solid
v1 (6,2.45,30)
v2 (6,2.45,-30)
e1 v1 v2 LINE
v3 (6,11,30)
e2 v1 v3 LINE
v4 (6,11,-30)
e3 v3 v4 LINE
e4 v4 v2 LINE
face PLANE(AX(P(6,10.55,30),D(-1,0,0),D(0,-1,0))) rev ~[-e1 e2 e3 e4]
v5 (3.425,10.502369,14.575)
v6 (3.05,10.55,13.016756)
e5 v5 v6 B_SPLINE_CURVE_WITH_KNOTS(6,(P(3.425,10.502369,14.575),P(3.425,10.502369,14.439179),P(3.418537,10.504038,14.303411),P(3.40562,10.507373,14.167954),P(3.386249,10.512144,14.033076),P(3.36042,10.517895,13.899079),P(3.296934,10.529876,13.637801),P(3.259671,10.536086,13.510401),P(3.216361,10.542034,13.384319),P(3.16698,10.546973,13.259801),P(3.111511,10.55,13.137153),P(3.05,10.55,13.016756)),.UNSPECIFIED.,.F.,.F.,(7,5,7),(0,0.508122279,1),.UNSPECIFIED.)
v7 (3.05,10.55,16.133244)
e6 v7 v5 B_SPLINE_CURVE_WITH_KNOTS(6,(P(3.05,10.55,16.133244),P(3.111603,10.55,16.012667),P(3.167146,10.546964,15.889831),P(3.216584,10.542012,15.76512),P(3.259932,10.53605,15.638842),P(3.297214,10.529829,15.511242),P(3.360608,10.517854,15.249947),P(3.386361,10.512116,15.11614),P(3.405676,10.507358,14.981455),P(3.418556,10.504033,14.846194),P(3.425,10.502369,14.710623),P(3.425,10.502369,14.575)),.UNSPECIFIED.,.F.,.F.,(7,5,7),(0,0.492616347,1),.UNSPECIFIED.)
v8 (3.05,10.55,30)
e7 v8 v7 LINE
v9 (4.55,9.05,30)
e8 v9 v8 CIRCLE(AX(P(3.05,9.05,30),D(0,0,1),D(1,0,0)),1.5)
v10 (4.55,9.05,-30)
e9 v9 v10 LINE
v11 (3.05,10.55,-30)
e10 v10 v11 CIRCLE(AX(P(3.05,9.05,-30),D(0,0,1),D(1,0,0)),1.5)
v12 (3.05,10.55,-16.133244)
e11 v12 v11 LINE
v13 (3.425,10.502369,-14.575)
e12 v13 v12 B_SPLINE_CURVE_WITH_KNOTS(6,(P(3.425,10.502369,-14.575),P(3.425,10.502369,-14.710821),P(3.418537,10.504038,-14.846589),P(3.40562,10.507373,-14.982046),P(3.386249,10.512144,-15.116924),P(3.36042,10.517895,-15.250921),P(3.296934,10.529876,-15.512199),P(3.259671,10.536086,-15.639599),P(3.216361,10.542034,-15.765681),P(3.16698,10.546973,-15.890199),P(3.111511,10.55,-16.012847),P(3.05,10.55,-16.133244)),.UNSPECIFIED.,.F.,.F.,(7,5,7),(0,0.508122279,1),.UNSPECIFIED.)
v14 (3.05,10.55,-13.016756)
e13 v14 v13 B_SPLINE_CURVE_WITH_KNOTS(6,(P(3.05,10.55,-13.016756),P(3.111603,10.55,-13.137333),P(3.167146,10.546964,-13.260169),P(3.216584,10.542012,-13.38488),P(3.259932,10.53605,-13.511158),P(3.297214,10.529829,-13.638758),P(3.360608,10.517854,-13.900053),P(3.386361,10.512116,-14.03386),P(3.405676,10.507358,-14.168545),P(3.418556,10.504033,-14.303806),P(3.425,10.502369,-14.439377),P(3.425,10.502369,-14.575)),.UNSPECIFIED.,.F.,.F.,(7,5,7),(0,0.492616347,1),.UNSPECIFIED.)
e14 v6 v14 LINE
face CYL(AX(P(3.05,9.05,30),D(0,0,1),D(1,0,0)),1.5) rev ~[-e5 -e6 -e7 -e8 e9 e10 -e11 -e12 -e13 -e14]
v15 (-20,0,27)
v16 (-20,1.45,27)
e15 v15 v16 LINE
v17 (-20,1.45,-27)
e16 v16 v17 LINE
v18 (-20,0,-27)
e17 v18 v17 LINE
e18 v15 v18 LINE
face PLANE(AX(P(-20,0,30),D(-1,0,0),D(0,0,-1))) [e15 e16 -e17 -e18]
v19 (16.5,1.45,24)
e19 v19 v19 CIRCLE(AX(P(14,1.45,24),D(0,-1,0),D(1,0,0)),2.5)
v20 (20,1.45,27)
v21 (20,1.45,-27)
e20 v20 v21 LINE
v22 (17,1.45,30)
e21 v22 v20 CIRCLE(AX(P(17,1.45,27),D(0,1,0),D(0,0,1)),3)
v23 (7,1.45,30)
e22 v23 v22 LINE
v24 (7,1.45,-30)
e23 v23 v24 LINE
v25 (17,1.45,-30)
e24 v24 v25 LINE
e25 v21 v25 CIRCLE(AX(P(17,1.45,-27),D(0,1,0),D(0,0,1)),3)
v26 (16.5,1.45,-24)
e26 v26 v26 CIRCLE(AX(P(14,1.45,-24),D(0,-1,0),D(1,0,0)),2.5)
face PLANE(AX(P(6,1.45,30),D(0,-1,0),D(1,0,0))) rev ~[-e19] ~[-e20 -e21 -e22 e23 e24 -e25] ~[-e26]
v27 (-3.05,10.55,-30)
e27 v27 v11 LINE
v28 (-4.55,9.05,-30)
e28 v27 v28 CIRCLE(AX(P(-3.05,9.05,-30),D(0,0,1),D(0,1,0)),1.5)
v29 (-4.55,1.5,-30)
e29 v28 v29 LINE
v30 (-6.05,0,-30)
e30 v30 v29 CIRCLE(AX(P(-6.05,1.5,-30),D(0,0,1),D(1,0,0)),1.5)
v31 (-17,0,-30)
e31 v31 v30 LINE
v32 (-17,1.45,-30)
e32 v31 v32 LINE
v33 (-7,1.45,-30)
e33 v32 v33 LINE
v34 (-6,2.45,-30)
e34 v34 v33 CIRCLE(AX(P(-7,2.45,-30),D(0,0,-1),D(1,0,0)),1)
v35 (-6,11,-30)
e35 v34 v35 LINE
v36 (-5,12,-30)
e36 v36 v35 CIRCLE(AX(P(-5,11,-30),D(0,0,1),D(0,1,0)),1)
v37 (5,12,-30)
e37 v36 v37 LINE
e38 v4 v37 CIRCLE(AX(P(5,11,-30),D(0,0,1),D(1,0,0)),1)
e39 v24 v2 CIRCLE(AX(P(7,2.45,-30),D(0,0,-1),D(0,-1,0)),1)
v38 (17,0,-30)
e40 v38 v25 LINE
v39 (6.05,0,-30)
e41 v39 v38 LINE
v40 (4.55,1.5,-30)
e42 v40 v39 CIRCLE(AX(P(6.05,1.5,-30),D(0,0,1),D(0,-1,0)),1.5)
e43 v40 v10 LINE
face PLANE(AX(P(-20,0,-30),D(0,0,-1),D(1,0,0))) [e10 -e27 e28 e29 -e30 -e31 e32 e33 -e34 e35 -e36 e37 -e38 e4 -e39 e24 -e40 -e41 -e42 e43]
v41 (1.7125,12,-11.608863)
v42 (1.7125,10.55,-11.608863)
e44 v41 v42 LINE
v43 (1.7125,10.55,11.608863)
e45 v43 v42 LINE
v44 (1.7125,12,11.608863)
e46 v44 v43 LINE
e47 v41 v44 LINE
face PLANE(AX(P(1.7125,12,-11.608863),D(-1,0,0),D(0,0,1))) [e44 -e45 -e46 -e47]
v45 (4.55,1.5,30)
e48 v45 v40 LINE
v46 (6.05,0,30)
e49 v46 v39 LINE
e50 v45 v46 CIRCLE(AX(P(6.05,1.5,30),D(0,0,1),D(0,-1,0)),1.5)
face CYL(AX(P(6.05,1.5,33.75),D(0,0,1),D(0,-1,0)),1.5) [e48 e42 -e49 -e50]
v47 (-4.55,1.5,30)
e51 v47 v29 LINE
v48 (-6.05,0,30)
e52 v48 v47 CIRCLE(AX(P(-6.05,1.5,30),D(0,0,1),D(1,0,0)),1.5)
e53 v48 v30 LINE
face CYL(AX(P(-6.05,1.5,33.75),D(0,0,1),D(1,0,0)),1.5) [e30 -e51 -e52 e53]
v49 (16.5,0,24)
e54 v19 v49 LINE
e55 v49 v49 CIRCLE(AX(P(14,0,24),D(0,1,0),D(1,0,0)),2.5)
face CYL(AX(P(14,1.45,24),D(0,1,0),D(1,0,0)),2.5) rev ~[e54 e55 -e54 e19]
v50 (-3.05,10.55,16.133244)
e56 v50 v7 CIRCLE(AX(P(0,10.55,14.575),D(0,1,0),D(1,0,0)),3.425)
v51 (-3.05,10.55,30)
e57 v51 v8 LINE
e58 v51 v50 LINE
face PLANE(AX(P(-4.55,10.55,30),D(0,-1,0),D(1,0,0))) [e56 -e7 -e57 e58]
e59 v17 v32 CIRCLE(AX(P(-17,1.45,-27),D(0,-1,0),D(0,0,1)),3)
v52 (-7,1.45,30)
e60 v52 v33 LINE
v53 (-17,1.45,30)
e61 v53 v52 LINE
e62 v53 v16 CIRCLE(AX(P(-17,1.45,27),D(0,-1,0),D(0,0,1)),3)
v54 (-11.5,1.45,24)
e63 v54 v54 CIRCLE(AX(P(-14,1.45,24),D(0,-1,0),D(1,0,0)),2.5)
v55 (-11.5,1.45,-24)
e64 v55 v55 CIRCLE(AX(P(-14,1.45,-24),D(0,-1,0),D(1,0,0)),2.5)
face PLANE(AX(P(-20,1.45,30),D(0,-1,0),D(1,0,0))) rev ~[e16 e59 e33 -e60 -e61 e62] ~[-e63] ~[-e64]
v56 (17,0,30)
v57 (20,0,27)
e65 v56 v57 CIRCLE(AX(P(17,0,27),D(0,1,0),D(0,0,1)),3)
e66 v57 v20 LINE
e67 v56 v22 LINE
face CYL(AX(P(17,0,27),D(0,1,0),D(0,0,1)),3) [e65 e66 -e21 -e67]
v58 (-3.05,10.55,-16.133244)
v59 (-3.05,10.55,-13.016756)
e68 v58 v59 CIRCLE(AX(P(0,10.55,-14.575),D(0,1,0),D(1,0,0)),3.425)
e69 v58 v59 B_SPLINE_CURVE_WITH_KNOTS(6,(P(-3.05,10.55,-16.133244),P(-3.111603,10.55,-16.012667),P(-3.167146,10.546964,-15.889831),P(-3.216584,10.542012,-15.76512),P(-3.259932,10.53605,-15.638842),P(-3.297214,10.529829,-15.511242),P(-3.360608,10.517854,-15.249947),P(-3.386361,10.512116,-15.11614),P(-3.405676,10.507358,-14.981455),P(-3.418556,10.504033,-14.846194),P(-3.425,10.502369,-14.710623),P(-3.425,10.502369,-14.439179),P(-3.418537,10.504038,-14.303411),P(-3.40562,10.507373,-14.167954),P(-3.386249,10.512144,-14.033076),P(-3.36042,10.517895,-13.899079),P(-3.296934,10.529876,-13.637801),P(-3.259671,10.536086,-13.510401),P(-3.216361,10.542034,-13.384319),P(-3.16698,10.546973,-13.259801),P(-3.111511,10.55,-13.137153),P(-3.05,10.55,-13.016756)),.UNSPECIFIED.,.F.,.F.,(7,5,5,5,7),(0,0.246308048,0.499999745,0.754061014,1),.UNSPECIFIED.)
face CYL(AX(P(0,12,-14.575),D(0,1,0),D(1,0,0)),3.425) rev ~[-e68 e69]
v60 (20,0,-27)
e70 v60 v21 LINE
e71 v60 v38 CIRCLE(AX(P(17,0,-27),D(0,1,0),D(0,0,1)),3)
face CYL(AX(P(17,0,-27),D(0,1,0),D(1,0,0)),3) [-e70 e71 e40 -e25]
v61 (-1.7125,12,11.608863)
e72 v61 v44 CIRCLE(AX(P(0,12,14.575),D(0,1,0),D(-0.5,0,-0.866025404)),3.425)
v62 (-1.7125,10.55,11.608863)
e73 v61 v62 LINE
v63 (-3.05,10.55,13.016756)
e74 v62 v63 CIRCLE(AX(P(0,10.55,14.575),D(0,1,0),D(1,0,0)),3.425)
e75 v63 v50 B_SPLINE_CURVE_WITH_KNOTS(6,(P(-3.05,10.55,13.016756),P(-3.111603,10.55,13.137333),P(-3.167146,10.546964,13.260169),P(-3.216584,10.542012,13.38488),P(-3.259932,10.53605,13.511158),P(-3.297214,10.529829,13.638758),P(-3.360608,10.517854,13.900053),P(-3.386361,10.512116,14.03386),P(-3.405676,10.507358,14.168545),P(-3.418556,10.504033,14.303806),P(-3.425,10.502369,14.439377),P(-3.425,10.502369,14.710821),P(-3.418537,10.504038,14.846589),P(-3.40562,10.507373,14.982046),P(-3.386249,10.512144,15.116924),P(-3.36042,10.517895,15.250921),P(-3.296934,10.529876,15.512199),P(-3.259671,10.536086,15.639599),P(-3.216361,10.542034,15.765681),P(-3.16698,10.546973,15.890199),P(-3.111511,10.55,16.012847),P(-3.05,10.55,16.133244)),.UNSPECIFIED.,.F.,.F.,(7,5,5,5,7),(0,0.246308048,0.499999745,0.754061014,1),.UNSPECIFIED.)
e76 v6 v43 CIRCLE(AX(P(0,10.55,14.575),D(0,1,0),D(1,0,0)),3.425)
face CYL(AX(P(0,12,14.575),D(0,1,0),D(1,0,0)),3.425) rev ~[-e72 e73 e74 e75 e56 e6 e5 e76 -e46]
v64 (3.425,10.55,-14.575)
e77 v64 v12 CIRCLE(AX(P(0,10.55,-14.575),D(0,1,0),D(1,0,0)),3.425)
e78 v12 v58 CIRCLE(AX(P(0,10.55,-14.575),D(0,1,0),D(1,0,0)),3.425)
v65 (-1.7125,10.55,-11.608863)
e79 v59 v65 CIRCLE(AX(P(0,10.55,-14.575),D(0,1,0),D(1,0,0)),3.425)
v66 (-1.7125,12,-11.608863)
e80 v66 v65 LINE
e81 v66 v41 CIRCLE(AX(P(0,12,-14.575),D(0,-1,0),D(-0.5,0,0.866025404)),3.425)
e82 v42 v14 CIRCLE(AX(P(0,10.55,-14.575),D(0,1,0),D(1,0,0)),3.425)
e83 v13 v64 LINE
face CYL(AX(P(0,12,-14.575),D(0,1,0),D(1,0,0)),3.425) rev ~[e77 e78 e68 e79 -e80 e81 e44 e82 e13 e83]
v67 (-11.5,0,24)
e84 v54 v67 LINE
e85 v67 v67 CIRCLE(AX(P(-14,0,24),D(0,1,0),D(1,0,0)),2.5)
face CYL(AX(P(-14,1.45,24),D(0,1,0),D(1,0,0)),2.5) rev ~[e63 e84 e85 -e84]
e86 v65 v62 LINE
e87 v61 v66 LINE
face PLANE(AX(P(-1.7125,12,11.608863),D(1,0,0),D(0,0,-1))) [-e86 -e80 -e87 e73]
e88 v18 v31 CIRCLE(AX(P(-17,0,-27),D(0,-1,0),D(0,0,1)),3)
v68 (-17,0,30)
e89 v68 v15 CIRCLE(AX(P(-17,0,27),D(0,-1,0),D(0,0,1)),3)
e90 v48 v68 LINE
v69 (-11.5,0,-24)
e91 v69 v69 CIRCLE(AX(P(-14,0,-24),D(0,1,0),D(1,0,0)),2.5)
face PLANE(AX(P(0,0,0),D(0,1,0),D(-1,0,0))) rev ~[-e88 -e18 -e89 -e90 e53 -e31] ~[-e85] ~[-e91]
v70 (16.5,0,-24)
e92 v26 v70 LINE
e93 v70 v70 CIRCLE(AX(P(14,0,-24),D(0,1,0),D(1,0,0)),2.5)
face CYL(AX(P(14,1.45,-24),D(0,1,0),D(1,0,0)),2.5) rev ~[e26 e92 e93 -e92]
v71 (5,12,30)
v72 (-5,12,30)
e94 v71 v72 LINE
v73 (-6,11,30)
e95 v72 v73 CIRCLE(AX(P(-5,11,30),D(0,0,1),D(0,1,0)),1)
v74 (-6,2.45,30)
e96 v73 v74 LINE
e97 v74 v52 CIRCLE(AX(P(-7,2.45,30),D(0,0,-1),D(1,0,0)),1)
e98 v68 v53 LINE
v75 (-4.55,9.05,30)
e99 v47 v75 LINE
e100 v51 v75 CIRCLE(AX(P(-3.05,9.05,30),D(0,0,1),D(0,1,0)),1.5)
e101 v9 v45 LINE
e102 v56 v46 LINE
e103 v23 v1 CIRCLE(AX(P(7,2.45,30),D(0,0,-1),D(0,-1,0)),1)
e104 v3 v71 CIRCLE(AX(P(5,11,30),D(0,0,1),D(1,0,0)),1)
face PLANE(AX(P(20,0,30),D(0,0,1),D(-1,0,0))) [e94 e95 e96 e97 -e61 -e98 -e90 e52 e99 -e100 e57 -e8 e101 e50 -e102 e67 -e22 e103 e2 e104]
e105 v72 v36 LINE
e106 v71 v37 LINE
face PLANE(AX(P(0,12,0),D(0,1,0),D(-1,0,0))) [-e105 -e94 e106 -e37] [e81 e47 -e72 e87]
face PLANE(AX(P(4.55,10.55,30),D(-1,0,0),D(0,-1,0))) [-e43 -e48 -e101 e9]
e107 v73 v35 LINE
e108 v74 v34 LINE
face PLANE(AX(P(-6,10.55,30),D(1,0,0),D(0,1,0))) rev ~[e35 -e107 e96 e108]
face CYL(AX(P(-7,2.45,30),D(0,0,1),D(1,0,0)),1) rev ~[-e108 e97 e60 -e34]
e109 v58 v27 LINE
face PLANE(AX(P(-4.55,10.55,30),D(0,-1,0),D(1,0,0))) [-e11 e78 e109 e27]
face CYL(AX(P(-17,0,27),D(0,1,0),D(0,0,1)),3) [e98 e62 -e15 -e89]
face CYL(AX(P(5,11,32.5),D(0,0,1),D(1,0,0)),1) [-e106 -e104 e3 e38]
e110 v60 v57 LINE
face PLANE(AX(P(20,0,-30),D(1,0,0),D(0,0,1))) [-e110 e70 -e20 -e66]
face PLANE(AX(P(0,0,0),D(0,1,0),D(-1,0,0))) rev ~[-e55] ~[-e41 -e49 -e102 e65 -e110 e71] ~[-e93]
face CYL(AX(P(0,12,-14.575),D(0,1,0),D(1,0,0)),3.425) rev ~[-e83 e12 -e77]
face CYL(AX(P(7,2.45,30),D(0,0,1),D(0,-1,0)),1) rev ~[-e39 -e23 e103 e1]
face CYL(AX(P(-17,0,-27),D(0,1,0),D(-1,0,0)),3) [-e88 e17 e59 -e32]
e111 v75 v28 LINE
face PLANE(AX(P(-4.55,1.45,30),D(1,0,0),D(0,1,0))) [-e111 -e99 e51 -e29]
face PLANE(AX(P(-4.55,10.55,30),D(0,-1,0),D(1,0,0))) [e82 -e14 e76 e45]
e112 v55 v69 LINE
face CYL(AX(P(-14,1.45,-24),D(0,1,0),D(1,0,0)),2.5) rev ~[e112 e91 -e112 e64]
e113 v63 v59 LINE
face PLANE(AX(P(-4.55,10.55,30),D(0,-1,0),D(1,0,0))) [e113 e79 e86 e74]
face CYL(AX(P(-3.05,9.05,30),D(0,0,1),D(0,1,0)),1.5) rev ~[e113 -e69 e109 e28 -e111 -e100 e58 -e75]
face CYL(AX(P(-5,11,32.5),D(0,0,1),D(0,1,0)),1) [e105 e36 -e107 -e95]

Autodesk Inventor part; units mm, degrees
ref_plane "YZ Plane" through (0, 0, 0) normal (1, 0, 0) x (0, 1, 0)
ref_plane "XZ Plane" through (0, 0, 0) normal (0, 1, 0) x (-1, 0, 0)
ref_plane "XY Plane" through (0, 0, 0) normal (0, 0, 1) x (1, 0, 0)
sketch "Sketch1" plane through (0, 0, 0) normal (0, 1, 0) x (-1, 0, 0)
  line L0 (-20, 30) -> (20, 30)
  line L1 (20, 30) -> (20, -30)
  line L2 (20, -30) -> (-20, -30)
  line L3 (-20, -30) -> (-20, 30)
  line L4 (-20, 30) -> (20, -30) construction
  line L5 (20, 30) -> (-20, -30) construction
  point P0 (0, 0)
  dimension "d0" = 40
  dimension "d1" = 60
extrude "Extrusion1" add sketch "Sketch1" along normal blind 12
sketch "Sketch2" plane through (-20, 0, 30) normal (0, 0, 1) x (1, 0, 0)
  line L0 (0, 0) -> (0, 12) projected
  line L1 (0, 0) -> (0, 1.45)
  line L2 (0, 1.45) -> (14, 1.45)
  line L3 (14, 1.45) -> (14, 12)
  line L4 (40, 12) -> (0, 12) projected
  line L5 (14, 12) -> (26, 12)
  line L6 (26, 12) -> (26, 1.45)
  line L7 (26, 1.45) -> (40, 1.45)
  line L8 (40, 0) -> (40, 12) projected
  line L9 (0, 12) -> (14, 12)
  line L10 (14, 12) -> (14, 1.45)
  line L11 (14, 1.45) -> (0, 1.45)
  line L12 (0, 1.45) -> (0, 12)
  line L13 (26, 1.45) -> (40, 1.45)
  line L14 (40, 1.45) -> (40, 12)
  line L15 (40, 12) -> (26, 12)
  line L16 (26, 12) -> (26, 1.45)
  line L17 (14, 1.45) -> (15.45, 1.45)
  line L18 (15.45, 1.45) -> (15.45, 12)
  line L19 (14, 12) -> (14, 10.55)
  line L20 (14, 10.55) -> (26, 10.55)
  line L21 (26, 12) -> (24.55, 12)
  line L22 (24.55, 12) -> (24.55, 1.45)
  line L23 (15.45, 10.55) -> (24.55, 10.55)
  line L24 (24.55, 10.55) -> (24.55, 0)
  line L25 (24.55, 0) -> (15.45, 0)
  line L26 (15.45, 0) -> (15.45, 10.55)
  point P0 (20, 0)
  point P1 (24.55, 1.45)
  point P2 (24.55, 10.55)
  point P3 (15.45, 1.45)
  dimension "d4" = 1.45
  dimension "d5" = 14
  dimension "d6" = 12
  dimension "d10" = 1.45
  dimension "d11" = 1.45
  dimension "d12" = 1.45
extrude "Extrusion2" cut sketch "Sketch2" against normal up to surface (60 mm away) contours L0 L4 L3 L2 | L18 L20 L22 L24 L25 L26 | L4 L8 L7 L6
sketch "Sketch3" plane through (-6, 1.45, 30) normal (0, 1, 0) x (1, 0, 0)
  line L0 (-14, 60) -> (-14, 0) projected
  line L1 (26, 0) -> (26, 60) projected
  line L2 (-14, 60) -> (26, 60)
  line L3 (26, 60) -> (26, 0)
  line L4 (26, 0) -> (-14, 0)
  line L5 (-14, 0) -> (-14, 60)
  line L6 (-14, 60) -> (-8, 60)
  line L7 (-8, 60) -> (-8, 54)
  line L8 (-8, 54) -> (-14, 54)
  line L9 (-14, 54) -> (-14, 60)
  circle A0 centre (-8, 54) radius 2.5
  line L10 (26, 60) -> (20, 60)
  line L11 (20, 60) -> (20, 54)
  line L12 (20, 54) -> (26, 54)
  line L13 (26, 54) -> (26, 60)
  circle A1 centre (20, 54) radius 2.5
  line L14 (26, 0) -> (25.5, 0) projected
  line L15 (26, 0) -> (20, 0)
  line L16 (20, 0) -> (20, 6)
  line L17 (20, 6) -> (26, 6)
  line L18 (26, 6) -> (26, 0)
  line L19 (-14, 0) -> (-8, 0)
  line L20 (-8, 0) -> (-8, 6)
  line L21 (-8, 6) -> (-14, 6)
  line L22 (-14, 6) -> (-14, 0)
  circle A2 centre (-8, 6) radius 2.5
  circle A3 centre (20, 6) radius 2.5
  point P0 (6, 30)
  dimension "d15" = 6
  dimension "d16" = 6
  dimension "d17" = 5
  dimension "d18" = 6
  dimension "d19" = 6
  dimension "d20" = 5
  dimension "d21" = 6
  dimension "d22" = 6
  dimension "d23" = 5
  dimension "d24" = 5
  dimension "d25" = 6
  dimension "d26" = 6
extrude "Extrusion3" cut sketch "Sketch3" against normal blind 12 contours A0 L7 L8 | L8 L7 A0 | A2 L20 L21 | L21 L20 A2 | A1 L12 L11 | L11 L12 A1 | A3 L17 L16 | L16 L17 A3
sketch "Sketch4" plane through (0, 12, 0) normal (0, 1, 0) x (1, 0, 0)
  line L0 (4.55, 30) -> (-4.55, 30) projected
  line L1 (0, 30) -> (0, 18)
  line L2 (-4.55, -30) -> (4.55, -30) projected
  line L3 (0, -30) -> (0, -18)
  line L4 (0, 18) -> (0, 14.575)
  line L5 (0, -18) -> (0, -14.575)
  circle A0 centre (0, 14.575) radius 3.425
  circle A1 centre (0, -14.575) radius 3.425
  line L6 (0, 14.575) -> (1.7125, 14.575)
  line L7 (1.7125, 14.575) -> (1.7125, -14.575)
  line L8 (1.7125, -14.575) -> (0, -14.575)
  line L9 (0, -14.575) -> (0, 14.575)
  line L10 (0, 14.575) -> (1.7125, 14.575) construction
  line L11 (0, -14.575) -> (-1.7125, -14.575)
  line L12 (-1.7125, -14.575) -> (-1.7125, 14.575)
  line L13 (-1.7125, 14.575) -> (0, 14.575)
  line L14 (0, 14.575) -> (0, -14.575)
  point P0 (0, 0)
  point P1 (3.55, 30)
  point P2 (-3.55, 30)
  point P3 (-3.55, -30)
  point P4 (3.55, -30)
  point P5 (1.7125, -11.6089)
  point P6 (1.7125, 11.6089)
  point P7 (-1.7125, 11.6089)
  point P8 (-1.7125, -11.6089)
  dimension "d29" = 12
  dimension "d30" = 12
  dimension "d31" = 3.425
  dimension "d32" = 3.425
  dimension "d33" = 1.7125
  dimension "d34" = 0
  dimension "d35" = 1.7125
extrude "Extrusion4" cut sketch "Sketch4" against normal blind 12
fillet "Fillet3" radius 3 4 edges at (20, 0.725, 30) (-20, 0.725, 30) (20, 0.725, -30) (-20, 0.725, -30)
fillet "Fillet4" radius 1 4 edges at (6, 1.45, 0) (6, 12, 0) (-6, 12, 0) (-6, 1.45, 0)
fillet "Fillet4" radius 1.5 4 edges at (-4.55, 10.55, 0) (4.55, 10.55, 0) (4.55, 0, 0) (-4.55, 0, 0)
equation "\"d10\" = d4"
equation "\"d11\" = d4"
equation "\"d12\" = d4"
equation "\"d18\" = d15"
equation "\"d19\" = d16"
equation "\"d20\" = d17"
equation "\"d21\" = d15"
equation "\"d22\" = d16"
equation "\"d23\" = d17"
equation "\"d24\" = d17"
equation "\"d25\" = d15"
equation "\"d26\" = d16"
equation "\"d30\" = d29"
equation "\"d32\" = d31"
properties part number "part1pasador"
